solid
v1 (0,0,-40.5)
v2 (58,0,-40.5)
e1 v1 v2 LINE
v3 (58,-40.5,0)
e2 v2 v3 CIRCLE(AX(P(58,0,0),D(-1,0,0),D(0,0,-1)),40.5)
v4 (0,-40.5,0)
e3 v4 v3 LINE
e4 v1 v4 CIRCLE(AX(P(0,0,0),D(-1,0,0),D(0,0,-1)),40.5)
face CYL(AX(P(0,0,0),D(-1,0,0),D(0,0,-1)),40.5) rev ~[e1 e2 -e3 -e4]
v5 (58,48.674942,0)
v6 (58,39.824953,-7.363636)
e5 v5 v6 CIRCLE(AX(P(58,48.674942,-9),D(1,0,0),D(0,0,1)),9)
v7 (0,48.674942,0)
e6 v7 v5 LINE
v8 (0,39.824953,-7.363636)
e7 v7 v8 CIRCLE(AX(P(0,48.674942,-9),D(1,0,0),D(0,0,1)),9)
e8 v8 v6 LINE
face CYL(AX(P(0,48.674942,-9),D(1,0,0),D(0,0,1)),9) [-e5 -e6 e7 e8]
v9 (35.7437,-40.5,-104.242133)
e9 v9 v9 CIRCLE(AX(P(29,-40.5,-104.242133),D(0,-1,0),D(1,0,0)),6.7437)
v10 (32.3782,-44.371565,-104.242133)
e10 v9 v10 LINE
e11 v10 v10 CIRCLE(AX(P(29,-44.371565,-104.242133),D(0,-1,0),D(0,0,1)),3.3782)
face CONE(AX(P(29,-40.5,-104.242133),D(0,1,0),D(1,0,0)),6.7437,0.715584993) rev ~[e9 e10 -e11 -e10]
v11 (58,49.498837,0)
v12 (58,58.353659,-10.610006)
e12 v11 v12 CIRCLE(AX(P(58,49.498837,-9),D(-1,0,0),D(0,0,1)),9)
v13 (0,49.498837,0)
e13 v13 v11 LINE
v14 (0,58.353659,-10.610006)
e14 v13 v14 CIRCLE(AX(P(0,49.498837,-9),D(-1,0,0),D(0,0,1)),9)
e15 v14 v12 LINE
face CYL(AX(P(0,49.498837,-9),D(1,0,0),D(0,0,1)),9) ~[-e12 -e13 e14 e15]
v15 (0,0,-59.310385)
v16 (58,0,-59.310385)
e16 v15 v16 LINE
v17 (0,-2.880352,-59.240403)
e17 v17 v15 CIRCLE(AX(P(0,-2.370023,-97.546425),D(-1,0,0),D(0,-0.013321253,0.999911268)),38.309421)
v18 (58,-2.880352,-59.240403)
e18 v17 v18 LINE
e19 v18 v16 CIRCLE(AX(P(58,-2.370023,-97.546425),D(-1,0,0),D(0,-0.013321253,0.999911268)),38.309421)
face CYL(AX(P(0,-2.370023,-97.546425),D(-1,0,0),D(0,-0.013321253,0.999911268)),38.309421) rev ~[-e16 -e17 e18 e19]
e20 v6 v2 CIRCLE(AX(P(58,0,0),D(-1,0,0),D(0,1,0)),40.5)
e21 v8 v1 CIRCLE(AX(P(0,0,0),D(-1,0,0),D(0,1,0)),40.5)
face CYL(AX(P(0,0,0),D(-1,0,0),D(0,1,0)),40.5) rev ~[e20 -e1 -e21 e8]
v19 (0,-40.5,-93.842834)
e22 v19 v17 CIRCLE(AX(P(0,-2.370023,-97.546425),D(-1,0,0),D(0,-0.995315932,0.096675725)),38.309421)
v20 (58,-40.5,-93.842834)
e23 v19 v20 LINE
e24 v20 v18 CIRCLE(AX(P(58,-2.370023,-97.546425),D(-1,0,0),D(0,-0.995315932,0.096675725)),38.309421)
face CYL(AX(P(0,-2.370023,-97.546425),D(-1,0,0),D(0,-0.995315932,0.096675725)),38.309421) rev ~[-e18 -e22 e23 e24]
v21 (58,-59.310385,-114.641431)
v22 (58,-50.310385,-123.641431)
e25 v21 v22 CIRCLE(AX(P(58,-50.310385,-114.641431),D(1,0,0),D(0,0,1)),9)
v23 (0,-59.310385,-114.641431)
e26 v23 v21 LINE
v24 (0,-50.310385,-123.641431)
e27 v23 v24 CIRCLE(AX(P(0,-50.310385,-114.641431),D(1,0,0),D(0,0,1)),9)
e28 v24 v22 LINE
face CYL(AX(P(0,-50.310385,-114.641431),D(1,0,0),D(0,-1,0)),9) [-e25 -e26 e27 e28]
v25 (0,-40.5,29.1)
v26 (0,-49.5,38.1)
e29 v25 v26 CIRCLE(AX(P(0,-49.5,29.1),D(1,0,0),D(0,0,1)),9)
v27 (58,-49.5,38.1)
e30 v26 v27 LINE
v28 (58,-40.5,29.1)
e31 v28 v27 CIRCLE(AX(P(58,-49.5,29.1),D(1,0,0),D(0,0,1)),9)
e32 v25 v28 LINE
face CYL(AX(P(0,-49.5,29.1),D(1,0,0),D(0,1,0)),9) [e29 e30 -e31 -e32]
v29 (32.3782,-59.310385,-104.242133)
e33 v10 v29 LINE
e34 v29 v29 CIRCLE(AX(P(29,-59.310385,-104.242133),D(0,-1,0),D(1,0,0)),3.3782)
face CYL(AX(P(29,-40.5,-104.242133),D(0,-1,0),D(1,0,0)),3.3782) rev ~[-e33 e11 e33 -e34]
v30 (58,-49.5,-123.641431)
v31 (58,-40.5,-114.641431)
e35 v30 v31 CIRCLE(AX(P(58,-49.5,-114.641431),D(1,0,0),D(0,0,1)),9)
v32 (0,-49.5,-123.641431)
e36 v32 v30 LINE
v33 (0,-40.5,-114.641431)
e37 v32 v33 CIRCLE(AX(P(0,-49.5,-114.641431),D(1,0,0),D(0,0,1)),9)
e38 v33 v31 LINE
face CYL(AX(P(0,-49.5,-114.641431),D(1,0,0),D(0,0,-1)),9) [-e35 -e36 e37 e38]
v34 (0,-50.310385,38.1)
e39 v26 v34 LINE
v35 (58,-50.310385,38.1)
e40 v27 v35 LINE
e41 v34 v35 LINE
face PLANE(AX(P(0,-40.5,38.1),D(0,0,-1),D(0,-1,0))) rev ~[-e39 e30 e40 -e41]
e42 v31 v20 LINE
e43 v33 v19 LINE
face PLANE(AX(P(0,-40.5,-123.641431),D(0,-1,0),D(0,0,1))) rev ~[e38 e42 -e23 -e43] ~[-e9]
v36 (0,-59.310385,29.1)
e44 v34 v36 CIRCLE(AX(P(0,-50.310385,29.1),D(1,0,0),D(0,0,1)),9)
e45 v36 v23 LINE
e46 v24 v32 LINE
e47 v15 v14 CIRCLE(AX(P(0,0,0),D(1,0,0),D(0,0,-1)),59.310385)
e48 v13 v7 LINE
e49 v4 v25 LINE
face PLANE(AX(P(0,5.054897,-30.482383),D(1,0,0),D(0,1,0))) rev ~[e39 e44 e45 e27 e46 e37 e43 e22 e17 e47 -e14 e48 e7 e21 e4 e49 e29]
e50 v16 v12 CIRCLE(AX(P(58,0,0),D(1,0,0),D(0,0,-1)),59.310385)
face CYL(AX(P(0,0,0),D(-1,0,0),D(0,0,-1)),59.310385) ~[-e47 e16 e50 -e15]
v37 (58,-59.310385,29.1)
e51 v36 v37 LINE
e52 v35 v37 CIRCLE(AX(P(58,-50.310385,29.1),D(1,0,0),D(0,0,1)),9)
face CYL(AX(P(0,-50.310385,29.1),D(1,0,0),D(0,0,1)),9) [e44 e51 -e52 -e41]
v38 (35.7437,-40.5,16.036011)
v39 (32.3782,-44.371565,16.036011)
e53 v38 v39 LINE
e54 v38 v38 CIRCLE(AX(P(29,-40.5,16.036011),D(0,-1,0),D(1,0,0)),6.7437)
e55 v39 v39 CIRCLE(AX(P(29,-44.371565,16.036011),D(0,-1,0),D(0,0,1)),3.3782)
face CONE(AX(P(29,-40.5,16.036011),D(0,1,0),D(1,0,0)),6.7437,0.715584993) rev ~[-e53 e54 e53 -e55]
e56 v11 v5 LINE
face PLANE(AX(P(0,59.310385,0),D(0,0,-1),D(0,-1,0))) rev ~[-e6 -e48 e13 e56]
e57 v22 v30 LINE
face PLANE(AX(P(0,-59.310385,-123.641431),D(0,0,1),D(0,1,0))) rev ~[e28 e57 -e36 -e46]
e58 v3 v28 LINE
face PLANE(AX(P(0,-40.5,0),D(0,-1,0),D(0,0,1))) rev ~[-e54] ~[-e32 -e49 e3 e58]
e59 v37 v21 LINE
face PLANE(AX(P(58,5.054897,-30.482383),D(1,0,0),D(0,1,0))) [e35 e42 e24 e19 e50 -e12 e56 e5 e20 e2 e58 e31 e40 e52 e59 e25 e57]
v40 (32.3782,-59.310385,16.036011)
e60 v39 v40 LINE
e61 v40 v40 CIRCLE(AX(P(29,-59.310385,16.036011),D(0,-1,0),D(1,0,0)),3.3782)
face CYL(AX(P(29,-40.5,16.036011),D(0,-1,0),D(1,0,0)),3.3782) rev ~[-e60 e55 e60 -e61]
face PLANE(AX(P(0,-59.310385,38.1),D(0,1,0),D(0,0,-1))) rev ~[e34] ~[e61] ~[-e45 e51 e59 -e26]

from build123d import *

# Parameters (mm, degrees)
F1_DEPTH       = 58
F2_R           = 9
F4_D           = 6.7564
F4_DEPTH       = 127
F4_CSINK_D     = 13.4874
F4_CSINK_ANGLE = 82
F4_TIP         = 2.0298273432


# Not quite as in the source:
# - a feature names something its author has since deleted; it is built from what else it names


with BuildPart() as f1:
    # F0 (on Right) → F1 (new body)
    with BuildSketch(Plane.YZ):
        with BuildLine():
            Line((59.3103850067, 0), (40.5, 0))
            ThreePointArc((40.5, 0), (28.6378246381, -28.6378246381), (0, -40.5))
            ThreePointArc((0, -40.5), (-28.6378246381, -28.6378246381), (-40.5, 0))
            Line((-40.5, 0), (-40.5, -43.3298023263))
            ThreePointArc((-40.5, -43.3298023263), (-23.1030418264, -54.62573778), (-2.8803521713, -59.2404029443))
            ThreePointArc((-2.8803521713, -59.2404029443), (-1.4395179453, -59.2483059491), (0, -59.3103850067))
            ThreePointArc((0, -59.3103850067), (41.938775433, -41.938775433), (59.3103850067, 0))
        make_face()
        with BuildLine():
            Line((-40.5, -43.3298023263), (-40.5, 0))
            Line((-40.5, 0), (-59.3103850067, 0))
            ThreePointArc((-59.3103850067, 0), (-54.4049279129, -23.6183316184), (-40.5, -43.3298023263))
        make_face()
        with BuildLine():
            Line((-59.3103850067, 0), (-40.5, 0))
            Line((-40.5, 0), (-40.5, 38.1))
            Line((-40.5, 38.1), (-45.4545021933, 38.1))
            ThreePointArc((-45.4545021933, 38.1), (-55.7388813801, 20.2706406444), (-59.3103850067, 0))
        make_face()
        with BuildLine():
            Line((-59.3103850067, 38.1), (-59.3103850067, 0))
            ThreePointArc((-59.3103850067, 0), (-55.7388813801, 20.2706406444), (-45.4545021933, 38.1))
            Line((-45.4545021933, 38.1), (-59.3103850067, 38.1))
        make_face()
        with BuildLine():
            ThreePointArc((-40.5, -43.3298023263), (-54.4049279129, -23.6183316184), (-59.3103850067, 0))
            Line((-59.3103850067, 0), (-59.3103850067, -123.6414313316))
            Line((-59.3103850067, -123.6414313316), (-40.5, -123.6414313316))
            Line((-40.5, -123.6414313316), (-40.5, -93.8428338624))
            Line((-40.5, -93.8428338624), (-40.5, -43.3298023263))
        make_face()
        with BuildLine():
            ThreePointArc((-2.8803521713, -59.2404029443), (-23.1030418264, -54.62573778), (-40.5, -43.3298023263))
            Line((-40.5, -43.3298023263), (-40.5, -93.8428338624))
            ThreePointArc((-40.5, -93.8428338624), (-28.3045630471, -69.3504788941), (-2.8803521713, -59.2404029443))
        make_face()
    extrude(amount=F1_DEPTH)

    # F2
    f2_edges = [f1.edges().sort_by_distance(p)[0] for p in [
        (29, -40.5, 38.1),
        (29, -59.310385, 38.1),
        (29, 59.310385, 0),
        (29, 40.5, 0),
        (29, -40.5, -123.641431),
        (29, -59.310385, -123.641431),
    ]]
    fillet(f2_edges, radius=F2_R)

    # F4
    with Locations(Plane(origin=(0, -40.5, 0), x_dir=(-1, 0, 0), z_dir=(0, 1, 0))):
        with Locations((-29, 16.0360112786), (-29, -104.242132597)):
            CounterSinkHole(F4_D / 2, F4_CSINK_D / 2, depth=F4_DEPTH, counter_sink_angle=F4_CSINK_ANGLE)
            with Locations((0, 0, -(F4_DEPTH + F4_TIP / 2))):  # 118° drill point
                Cone(0, F4_D / 2, F4_TIP, mode=Mode.SUBTRACT)


solid = f1.part
